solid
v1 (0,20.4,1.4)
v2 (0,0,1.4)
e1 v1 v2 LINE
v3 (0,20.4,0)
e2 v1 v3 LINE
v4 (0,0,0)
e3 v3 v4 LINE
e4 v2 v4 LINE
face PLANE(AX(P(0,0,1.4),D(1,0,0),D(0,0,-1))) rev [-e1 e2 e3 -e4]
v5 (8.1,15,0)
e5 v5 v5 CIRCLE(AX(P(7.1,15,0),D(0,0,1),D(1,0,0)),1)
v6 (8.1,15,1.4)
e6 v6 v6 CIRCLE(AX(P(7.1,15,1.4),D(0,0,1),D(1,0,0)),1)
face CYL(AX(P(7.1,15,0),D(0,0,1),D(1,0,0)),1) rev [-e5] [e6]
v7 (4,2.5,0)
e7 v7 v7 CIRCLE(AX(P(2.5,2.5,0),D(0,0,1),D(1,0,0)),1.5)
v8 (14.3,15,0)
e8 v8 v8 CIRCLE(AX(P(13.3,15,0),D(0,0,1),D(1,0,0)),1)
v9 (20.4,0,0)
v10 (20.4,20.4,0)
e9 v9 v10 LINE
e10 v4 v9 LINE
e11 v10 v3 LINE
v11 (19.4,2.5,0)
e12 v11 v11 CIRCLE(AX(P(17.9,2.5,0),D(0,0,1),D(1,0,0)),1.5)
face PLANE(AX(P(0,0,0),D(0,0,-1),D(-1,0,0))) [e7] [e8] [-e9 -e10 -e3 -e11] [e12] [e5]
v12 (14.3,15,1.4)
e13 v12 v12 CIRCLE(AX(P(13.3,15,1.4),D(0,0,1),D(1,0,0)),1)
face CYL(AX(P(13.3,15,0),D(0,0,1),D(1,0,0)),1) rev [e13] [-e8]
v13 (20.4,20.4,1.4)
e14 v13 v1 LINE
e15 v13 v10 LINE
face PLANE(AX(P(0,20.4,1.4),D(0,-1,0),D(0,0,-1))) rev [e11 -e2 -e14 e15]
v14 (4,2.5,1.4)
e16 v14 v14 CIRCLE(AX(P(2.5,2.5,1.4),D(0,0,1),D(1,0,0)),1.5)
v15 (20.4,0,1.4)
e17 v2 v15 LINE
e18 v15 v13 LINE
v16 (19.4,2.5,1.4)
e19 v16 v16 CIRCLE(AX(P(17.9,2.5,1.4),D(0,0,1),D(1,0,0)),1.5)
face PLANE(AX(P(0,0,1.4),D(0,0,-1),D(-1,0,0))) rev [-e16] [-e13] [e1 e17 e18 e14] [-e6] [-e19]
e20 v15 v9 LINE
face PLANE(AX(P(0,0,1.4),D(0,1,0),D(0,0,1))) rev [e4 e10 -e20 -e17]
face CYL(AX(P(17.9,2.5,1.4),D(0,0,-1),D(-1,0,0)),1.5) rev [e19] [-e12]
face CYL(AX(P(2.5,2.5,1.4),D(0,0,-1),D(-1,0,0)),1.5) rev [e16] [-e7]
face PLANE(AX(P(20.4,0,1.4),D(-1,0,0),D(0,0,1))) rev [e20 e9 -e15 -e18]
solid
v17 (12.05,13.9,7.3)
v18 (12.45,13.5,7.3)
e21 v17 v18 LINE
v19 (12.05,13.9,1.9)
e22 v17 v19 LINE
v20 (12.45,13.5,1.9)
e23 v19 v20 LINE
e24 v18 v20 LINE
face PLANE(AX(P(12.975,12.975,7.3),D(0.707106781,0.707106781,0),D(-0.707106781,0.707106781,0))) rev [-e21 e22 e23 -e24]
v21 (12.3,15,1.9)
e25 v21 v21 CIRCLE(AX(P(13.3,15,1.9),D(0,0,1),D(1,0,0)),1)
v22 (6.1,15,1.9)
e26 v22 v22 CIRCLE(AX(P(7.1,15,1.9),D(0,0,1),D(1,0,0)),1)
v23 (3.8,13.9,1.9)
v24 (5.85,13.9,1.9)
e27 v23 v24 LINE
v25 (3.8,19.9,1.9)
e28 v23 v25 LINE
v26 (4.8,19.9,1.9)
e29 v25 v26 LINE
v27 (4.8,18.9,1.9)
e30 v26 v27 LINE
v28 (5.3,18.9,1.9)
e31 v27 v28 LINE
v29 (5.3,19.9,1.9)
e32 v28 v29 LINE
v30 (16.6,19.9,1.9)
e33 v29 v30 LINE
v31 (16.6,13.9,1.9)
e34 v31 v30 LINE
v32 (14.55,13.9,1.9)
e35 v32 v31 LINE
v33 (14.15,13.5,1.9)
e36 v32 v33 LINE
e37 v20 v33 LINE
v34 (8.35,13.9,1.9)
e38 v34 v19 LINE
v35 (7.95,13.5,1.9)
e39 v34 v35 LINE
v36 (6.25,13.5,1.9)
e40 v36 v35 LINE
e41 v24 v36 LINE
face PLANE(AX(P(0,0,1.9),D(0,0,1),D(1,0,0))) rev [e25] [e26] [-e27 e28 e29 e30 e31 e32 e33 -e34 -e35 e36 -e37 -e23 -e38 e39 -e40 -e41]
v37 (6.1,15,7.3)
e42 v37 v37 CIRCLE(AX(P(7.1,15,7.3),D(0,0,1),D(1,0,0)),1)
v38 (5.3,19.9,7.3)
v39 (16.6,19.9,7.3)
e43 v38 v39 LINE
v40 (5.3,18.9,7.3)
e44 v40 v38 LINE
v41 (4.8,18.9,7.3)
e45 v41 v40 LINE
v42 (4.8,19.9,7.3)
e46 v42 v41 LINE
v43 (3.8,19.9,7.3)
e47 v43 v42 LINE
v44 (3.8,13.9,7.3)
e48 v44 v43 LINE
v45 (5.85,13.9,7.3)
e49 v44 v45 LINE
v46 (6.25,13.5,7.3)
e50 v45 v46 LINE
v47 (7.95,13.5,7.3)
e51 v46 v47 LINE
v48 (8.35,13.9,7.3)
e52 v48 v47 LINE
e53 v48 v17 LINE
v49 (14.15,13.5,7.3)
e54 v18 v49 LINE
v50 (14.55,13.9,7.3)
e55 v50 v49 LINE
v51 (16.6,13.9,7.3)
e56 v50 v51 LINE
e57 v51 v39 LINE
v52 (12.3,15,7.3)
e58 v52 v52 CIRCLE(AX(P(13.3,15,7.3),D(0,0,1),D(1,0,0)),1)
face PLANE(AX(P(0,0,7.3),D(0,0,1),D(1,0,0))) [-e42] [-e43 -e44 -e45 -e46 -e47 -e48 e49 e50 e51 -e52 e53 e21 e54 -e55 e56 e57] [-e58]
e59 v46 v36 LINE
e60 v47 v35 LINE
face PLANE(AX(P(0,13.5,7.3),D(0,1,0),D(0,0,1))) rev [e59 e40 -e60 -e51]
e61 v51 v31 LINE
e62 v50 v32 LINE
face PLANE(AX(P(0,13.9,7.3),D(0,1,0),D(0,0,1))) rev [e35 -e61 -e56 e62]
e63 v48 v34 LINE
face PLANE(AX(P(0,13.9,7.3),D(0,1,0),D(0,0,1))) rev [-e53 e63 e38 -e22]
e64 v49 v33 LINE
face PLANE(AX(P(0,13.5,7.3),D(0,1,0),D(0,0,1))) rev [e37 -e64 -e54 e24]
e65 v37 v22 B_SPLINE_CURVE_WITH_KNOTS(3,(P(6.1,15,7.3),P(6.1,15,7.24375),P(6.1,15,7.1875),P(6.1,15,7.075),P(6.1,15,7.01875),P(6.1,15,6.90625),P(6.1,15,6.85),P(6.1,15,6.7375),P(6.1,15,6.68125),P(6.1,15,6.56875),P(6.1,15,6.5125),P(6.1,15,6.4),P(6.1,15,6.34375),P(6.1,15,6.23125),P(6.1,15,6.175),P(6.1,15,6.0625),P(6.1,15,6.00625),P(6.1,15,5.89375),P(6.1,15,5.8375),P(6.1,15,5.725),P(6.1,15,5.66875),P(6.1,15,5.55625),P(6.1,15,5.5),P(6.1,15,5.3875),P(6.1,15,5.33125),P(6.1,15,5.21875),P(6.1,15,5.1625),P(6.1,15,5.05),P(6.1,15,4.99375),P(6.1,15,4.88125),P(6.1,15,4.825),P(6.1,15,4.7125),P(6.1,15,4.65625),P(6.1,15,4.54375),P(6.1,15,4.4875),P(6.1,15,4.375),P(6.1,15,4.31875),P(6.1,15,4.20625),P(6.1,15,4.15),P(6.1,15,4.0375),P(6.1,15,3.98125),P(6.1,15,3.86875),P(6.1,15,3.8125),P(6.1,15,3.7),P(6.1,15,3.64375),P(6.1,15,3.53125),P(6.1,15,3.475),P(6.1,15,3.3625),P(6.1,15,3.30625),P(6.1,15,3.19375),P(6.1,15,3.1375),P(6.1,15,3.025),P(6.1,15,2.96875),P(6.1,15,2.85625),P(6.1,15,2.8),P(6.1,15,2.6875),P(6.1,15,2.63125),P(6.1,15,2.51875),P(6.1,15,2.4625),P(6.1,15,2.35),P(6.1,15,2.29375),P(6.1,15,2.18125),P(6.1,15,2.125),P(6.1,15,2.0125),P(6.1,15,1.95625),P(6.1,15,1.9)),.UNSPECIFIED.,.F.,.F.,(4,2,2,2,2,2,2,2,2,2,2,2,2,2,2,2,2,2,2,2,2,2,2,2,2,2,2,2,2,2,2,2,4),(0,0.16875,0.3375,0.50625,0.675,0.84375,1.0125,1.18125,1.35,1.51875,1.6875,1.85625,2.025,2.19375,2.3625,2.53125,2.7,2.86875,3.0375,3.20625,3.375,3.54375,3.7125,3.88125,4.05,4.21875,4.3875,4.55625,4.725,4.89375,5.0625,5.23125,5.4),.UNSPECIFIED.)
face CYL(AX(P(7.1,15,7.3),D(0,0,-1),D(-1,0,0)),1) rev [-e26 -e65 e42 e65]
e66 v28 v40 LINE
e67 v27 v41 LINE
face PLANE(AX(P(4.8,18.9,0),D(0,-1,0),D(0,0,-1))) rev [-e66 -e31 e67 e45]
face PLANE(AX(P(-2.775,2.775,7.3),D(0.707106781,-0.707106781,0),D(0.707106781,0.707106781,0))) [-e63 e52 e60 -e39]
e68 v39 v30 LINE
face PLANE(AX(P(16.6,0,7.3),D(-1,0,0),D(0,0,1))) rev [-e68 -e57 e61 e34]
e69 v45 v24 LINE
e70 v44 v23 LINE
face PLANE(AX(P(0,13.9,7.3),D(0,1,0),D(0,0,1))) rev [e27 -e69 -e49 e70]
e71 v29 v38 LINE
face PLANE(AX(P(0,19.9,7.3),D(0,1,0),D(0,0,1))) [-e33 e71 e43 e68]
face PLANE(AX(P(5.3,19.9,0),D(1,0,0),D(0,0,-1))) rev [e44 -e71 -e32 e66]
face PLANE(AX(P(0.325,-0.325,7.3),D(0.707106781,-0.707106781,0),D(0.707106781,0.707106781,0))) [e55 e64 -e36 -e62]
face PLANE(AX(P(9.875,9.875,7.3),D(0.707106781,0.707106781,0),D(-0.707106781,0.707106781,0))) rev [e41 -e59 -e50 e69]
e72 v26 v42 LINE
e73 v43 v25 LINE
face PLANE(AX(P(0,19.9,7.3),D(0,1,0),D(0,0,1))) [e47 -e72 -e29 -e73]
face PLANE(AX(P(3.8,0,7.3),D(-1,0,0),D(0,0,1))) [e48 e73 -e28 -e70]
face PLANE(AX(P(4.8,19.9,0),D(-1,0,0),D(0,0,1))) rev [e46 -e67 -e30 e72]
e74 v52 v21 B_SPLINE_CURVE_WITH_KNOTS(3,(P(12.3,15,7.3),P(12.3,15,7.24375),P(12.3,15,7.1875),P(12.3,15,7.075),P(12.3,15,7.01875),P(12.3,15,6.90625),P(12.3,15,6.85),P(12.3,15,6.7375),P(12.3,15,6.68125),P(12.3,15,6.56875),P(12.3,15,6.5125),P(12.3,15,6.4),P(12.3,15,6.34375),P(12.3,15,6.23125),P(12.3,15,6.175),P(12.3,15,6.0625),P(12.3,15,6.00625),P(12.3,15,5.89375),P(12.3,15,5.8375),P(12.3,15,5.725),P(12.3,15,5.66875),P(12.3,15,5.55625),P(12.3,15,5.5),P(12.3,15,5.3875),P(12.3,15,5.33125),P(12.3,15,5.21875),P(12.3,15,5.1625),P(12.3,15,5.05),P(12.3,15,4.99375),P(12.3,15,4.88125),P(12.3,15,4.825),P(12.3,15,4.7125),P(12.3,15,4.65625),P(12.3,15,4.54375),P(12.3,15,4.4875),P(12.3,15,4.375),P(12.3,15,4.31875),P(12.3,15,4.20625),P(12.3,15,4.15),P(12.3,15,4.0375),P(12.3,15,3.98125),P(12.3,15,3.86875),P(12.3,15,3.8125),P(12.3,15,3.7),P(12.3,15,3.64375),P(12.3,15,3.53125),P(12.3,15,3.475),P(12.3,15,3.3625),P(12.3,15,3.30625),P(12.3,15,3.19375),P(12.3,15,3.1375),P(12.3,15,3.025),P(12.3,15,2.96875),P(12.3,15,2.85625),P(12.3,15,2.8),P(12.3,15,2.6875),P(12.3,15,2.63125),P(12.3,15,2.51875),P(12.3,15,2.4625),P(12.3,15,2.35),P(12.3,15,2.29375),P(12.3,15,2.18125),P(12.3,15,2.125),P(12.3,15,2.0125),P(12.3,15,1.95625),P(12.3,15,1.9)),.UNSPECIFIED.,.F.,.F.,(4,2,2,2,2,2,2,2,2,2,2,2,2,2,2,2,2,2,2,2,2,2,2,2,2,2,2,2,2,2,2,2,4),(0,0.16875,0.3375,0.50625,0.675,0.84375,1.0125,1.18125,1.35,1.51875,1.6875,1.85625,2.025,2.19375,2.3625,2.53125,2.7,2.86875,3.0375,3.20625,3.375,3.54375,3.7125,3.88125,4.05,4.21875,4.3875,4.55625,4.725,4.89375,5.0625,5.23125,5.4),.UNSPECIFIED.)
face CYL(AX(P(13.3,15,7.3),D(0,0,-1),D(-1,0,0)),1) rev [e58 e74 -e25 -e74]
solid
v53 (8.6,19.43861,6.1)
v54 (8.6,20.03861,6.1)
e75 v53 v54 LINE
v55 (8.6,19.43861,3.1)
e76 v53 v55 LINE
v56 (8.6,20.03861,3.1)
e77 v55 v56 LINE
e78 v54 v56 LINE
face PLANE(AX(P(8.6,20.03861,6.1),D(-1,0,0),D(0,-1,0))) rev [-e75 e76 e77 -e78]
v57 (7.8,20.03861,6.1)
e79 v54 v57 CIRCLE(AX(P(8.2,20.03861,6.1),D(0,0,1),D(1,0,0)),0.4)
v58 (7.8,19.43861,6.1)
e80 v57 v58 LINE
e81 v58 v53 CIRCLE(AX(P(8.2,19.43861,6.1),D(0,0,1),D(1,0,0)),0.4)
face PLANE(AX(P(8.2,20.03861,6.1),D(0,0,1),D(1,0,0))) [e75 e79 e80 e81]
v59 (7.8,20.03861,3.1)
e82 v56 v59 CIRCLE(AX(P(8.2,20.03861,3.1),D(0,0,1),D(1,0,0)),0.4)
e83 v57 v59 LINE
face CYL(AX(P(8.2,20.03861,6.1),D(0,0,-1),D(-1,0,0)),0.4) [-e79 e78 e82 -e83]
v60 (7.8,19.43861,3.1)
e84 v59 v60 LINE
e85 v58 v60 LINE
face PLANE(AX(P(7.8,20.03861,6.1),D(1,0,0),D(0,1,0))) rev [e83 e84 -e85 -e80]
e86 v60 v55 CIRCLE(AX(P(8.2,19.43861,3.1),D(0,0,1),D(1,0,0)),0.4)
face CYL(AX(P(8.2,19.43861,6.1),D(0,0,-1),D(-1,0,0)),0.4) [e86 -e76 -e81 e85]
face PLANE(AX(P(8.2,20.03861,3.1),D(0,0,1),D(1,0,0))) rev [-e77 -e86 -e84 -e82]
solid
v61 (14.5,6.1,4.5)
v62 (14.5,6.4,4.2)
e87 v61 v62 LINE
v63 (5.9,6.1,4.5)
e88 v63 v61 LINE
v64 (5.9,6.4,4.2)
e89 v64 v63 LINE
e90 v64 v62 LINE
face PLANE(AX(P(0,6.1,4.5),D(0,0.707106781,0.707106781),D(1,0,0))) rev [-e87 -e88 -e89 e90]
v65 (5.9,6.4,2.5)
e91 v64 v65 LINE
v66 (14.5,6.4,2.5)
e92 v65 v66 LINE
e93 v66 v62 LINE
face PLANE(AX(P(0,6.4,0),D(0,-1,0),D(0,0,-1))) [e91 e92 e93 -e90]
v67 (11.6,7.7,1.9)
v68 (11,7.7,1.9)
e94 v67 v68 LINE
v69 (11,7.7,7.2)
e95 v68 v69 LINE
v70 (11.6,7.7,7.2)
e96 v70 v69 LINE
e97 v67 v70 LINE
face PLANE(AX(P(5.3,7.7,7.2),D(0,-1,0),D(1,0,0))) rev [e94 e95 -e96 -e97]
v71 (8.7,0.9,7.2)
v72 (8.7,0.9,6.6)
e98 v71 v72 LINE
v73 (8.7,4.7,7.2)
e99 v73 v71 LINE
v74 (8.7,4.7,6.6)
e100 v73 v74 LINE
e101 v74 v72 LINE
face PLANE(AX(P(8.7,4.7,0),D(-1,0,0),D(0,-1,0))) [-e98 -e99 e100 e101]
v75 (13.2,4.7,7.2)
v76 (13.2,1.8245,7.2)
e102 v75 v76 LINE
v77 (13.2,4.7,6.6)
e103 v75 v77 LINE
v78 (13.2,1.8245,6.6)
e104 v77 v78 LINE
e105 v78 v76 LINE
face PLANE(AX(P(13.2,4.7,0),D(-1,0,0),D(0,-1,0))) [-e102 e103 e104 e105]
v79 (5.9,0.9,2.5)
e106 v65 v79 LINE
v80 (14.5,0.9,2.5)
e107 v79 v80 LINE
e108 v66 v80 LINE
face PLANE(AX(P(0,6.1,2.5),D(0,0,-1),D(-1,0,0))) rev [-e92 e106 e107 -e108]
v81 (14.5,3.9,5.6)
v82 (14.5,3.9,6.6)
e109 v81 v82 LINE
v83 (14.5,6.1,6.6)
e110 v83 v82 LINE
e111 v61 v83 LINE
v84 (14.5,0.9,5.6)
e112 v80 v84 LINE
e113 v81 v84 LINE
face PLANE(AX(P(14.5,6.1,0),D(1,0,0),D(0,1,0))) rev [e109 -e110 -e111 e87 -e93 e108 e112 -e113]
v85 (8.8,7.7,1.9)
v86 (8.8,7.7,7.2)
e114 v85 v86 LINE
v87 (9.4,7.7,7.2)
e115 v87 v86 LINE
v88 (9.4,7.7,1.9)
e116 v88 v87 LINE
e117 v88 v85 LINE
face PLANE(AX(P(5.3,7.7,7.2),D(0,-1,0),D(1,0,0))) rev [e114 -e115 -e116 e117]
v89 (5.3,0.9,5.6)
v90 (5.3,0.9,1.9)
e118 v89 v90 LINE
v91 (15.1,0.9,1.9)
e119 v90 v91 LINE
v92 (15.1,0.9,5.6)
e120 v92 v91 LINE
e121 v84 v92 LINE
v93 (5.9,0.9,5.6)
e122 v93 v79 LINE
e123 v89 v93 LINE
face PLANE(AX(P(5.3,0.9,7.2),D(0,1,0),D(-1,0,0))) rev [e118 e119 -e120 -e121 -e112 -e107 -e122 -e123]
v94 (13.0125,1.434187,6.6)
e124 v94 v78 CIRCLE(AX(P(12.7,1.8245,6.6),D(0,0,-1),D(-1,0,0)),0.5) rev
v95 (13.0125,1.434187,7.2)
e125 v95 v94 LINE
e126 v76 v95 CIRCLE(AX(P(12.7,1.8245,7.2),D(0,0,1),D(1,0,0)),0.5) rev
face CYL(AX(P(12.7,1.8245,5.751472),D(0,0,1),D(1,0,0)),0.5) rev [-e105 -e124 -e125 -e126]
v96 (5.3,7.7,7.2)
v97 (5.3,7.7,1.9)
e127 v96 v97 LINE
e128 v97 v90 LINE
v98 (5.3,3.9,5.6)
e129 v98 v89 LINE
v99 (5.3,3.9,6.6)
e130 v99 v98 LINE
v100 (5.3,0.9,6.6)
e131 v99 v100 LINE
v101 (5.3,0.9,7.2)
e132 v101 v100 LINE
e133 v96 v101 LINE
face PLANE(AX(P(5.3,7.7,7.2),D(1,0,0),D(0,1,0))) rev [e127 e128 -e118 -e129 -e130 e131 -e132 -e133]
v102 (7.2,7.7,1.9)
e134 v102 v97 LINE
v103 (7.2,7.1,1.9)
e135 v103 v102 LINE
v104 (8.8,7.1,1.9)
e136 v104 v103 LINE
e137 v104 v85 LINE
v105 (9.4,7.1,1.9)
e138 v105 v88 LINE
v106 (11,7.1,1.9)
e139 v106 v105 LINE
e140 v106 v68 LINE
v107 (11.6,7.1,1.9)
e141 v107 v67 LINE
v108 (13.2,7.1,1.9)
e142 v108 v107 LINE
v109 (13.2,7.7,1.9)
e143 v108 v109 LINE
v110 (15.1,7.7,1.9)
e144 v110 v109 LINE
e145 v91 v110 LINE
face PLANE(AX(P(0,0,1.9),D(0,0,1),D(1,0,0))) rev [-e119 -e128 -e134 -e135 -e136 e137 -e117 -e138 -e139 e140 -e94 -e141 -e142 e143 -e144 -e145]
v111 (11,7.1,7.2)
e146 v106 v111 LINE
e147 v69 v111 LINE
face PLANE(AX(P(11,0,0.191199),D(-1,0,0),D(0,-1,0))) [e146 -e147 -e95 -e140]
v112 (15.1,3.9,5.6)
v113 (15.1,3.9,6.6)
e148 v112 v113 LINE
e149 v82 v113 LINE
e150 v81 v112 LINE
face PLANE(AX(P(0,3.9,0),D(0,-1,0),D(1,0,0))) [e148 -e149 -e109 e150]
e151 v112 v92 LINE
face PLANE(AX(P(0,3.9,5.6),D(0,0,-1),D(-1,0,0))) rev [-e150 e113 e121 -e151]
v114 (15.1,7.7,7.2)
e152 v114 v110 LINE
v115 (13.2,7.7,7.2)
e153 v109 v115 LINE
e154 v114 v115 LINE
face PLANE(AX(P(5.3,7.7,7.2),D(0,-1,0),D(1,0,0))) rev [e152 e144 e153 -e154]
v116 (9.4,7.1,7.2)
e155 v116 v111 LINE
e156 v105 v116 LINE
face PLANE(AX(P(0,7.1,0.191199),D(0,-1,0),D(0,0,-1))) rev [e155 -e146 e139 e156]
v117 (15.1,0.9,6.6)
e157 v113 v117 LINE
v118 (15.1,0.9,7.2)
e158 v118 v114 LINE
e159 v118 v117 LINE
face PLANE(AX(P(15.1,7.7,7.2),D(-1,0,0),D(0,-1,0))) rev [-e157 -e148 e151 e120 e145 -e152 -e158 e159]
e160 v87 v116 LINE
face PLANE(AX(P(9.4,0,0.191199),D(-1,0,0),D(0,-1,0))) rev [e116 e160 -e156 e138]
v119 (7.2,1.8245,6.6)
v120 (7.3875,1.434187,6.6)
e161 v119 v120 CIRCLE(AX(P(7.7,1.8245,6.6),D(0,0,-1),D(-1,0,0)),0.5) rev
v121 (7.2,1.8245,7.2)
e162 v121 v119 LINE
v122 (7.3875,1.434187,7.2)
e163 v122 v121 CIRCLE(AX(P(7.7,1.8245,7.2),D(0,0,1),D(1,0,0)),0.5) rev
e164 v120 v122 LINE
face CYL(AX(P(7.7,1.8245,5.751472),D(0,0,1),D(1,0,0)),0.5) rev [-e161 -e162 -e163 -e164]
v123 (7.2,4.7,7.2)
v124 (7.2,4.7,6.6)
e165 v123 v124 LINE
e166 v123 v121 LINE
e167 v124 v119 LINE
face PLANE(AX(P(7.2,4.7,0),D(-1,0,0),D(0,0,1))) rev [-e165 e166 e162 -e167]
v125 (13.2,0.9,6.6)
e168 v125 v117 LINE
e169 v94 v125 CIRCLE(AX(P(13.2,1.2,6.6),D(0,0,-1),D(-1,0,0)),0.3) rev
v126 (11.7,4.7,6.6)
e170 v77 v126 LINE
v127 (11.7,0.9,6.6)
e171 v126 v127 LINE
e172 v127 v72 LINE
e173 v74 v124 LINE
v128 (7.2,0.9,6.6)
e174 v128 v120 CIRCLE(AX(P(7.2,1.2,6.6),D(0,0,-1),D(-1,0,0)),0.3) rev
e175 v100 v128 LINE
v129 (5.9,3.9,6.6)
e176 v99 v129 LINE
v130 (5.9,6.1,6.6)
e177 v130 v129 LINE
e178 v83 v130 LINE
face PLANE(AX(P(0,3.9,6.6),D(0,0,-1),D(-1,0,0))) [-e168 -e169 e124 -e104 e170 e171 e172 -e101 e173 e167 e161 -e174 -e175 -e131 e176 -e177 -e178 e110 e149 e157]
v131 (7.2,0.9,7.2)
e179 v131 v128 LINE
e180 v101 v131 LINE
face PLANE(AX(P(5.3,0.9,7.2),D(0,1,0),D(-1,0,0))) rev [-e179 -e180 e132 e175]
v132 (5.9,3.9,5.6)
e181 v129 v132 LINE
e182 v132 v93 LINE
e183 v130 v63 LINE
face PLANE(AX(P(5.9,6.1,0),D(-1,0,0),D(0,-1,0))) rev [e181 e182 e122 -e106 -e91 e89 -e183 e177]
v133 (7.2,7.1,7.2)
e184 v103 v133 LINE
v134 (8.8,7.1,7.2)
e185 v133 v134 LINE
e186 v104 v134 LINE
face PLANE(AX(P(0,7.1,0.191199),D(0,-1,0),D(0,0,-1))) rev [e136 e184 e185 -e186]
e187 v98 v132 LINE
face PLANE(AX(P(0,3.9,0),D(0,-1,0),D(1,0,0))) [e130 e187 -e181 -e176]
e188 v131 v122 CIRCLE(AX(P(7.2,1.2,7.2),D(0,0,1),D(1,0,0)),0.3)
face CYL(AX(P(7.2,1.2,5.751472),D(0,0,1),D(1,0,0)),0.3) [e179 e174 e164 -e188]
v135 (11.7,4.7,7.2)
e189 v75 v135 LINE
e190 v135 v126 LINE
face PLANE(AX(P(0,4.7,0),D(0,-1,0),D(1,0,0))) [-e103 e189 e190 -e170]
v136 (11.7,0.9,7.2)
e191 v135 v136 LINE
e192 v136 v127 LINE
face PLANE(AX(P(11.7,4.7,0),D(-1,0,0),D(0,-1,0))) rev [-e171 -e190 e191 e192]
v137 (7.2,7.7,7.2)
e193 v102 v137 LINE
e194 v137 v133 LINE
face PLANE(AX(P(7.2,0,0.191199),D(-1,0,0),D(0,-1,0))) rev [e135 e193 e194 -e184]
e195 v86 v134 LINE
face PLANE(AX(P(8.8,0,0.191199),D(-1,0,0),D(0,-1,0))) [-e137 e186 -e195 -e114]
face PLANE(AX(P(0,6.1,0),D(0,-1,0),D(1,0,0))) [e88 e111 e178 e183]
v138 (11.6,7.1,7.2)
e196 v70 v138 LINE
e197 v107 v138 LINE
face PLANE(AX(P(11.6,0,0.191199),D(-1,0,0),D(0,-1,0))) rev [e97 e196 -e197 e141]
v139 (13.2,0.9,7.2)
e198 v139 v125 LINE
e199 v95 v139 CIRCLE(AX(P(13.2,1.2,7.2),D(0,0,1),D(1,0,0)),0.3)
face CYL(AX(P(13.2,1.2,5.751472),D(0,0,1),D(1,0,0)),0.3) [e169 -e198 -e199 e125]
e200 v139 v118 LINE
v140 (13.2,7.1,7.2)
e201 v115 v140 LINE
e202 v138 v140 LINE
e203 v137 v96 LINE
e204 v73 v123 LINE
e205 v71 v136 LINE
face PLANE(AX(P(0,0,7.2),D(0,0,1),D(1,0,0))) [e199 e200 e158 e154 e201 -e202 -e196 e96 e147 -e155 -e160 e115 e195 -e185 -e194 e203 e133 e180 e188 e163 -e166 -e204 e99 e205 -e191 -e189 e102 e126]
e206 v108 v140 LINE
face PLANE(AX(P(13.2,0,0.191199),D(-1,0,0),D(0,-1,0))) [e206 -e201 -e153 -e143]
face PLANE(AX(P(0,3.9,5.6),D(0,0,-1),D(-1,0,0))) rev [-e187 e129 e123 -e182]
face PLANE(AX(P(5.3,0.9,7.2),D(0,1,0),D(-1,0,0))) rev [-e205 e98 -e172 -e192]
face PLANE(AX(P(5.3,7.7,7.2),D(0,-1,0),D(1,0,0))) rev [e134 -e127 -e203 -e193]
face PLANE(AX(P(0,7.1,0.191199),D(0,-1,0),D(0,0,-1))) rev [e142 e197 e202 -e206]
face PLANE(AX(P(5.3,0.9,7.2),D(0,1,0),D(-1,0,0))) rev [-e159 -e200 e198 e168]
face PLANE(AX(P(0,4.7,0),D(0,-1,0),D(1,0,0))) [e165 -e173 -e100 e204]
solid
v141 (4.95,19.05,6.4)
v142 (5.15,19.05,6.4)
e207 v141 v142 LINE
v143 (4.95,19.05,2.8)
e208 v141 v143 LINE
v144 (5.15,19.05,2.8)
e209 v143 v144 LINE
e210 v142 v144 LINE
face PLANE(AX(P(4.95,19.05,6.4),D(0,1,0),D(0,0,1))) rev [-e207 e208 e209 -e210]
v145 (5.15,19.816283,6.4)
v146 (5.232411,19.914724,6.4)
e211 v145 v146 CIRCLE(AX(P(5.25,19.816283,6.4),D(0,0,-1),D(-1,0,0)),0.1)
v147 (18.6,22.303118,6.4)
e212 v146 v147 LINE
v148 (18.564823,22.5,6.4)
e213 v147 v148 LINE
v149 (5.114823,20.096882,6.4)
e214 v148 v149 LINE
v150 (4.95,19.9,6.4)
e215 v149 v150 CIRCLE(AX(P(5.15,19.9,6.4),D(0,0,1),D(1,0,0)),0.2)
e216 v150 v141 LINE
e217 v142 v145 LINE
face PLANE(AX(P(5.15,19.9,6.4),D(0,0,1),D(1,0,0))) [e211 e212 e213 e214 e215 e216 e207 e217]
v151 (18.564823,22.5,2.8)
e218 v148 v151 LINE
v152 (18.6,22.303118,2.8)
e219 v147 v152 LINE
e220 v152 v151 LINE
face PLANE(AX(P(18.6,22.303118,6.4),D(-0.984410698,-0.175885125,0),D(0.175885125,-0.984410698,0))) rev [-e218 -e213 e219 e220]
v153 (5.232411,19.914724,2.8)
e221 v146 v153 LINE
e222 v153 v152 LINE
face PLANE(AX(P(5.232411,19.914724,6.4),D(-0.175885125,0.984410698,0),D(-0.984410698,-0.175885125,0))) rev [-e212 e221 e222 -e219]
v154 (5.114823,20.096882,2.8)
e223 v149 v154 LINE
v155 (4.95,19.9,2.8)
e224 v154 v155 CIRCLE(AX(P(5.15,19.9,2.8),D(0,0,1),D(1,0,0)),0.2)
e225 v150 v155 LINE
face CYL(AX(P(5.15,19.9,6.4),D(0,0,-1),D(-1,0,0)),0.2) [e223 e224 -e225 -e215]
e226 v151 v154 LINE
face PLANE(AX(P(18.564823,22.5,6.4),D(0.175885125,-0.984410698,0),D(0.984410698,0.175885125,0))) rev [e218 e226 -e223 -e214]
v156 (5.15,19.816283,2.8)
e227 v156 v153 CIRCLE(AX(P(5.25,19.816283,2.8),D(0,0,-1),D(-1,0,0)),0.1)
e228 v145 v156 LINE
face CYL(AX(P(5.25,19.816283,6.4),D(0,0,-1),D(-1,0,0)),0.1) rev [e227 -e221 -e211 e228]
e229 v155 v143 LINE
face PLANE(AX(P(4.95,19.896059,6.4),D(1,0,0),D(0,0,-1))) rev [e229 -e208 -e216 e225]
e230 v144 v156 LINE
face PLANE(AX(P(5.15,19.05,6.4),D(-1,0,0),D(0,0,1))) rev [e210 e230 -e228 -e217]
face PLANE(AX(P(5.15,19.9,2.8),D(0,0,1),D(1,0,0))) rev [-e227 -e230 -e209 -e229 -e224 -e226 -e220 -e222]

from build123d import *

# Parameters (mm, degrees)
SKETCH_1_W               = 20.4
SKETCH_1_H               = 20.4
SKETCH_1_R               = 1.5
EXTRUDE_1_DEPTH          = 1.4
EXTRUDE_START            = 0.5
SKETCH_2_W               = 9.8
SKETCH_2_H               = 6.8
EXTRUDE_2_DEPTH          = 5.3
SKETCH_3_W               = 0.6
SKETCH_3_H               = 1
CUT_EXTRUDE_1_DEPTH      = 3
SKETCH_3_3_W             = 1.5
SKETCH_3_3_H             = 0.6
CUT_EXTRUDE_2_DEPTH      = 3.8
SKETCH_3_4_W             = 8.6
SKETCH_3_4_H             = 3.1
CUT_EXTRUDE_3_DEPTH      = 5.2
CUT_EXTRUDE_4_DEPTH      = 0.3
CHAMFER_1_SIZE           = 0.3
SKETCH_5_R               = 0.3
EXTRUDE_3_DEPTH          = 0.6
FILLET_2_R               = 0.5
SKETCH_6_W               = 1.6
SKETCH_6_H               = 0.6
CUT_EXTRUDE_5_DEPTH      = 5.3
SKETCH_7_R               = 1
EXTRUDE_4_DEPTH          = 5.4
SKETCH_8_R               = 1
CUT_EXTRUDE_6_DEPTH      = 30.447071162
CUT_EXTRUDE_9_DEPTH      = 30.214380021
CUT_EXTRUDE_9_DEPTH_BACK = 30.214380021
SKETCH_10_W              = 0.5
SKETCH_10_H              = 1
EXTRUDE_5_DEPTH          = 1.8
EXTRUDE_6_DEPTH          = 1.5


with BuildPart() as part:
    # Эскиз1 → Бобышка-Вытянуть1 (new body)
    with BuildSketch(Plane.XY):
        with Locations((10.2, 10.2)):
            Rectangle(SKETCH_1_W, SKETCH_1_H)
        with Locations((17.9, 2.5)):
            Circle(SKETCH_1_R, mode=Mode.SUBTRACT)
        with Locations((2.5, 2.5)):
            Circle(SKETCH_1_R, mode=Mode.SUBTRACT)
    extrude(amount=EXTRUDE_1_DEPTH)

    # Эскиз8 → Вырез-Вытянуть6 (cut, through all)
    with BuildSketch(Plane.XY.offset(1.4)):
        with Locations(Location((13.3, 15, 0), (0, 0, 180))):
            Circle(SKETCH_8_R)
        with Locations(Location((7.1, 15, 0), (0, 0, 180))):
            Circle(SKETCH_8_R)
    extrude(amount=-CUT_EXTRUDE_6_DEPTH, mode=Mode.SUBTRACT)


with BuildPart() as body_2:
    # Эскиз2 → Бобышка-Вытянуть2 (new body)
    with BuildSketch(Plane.XY.offset(1.4).offset(EXTRUDE_START)):
        with Locations((10.2, 4.3)):
            Rectangle(SKETCH_2_W, SKETCH_2_H)
    extrude(amount=EXTRUDE_2_DEPTH)

    # Эскиз3 → Вырез-Вытянуть1 (cut)
    with BuildSketch(Plane.XZ.offset(-0.9)):
        with Locations((5.6, 6.1)):
            Rectangle(SKETCH_3_W, SKETCH_3_H)
        with Locations((14.8, 6.1)):
            Rectangle(SKETCH_3_W, SKETCH_3_H)
    extrude(amount=-CUT_EXTRUDE_1_DEPTH, mode=Mode.SUBTRACT)

    # Эскиз3<3> → Вырез-Вытянуть2 (cut)
    with BuildSketch(Plane.XZ.offset(-0.9)):
        with Locations((7.95, 6.9)):
            Rectangle(SKETCH_3_3_W, SKETCH_3_3_H)
        with Locations((12.45, 6.9)):
            Rectangle(SKETCH_3_3_W, SKETCH_3_3_H)
    extrude(amount=-CUT_EXTRUDE_2_DEPTH, mode=Mode.SUBTRACT)

    # Эскиз3<4> → Вырез-Вытянуть3 (cut)
    with BuildSketch(Plane.XZ.offset(-0.9)):
        with Locations((10.2, 4.05)):
            Rectangle(SKETCH_3_4_W, SKETCH_3_4_H)
        Polygon((5.9, 6.6), (5.9, 5.6), (14.5, 5.6), (14.5, 6.6), (13.2, 6.6), (11.7, 6.6), (8.7, 6.6), (7.2, 6.6), align=None)
    extrude(amount=-CUT_EXTRUDE_3_DEPTH, mode=Mode.SUBTRACT)

    # Эскиз4 → Вырез-Вытянуть4 (cut)
    with BuildSketch(Plane.XZ.offset(-6.1)):
        Polygon((7.2, 4.2), (5.9, 4.2), (5.9, 2.5), (14.5, 2.5), (14.5, 4.2), align=None)
    extrude(amount=-CUT_EXTRUDE_4_DEPTH, mode=Mode.SUBTRACT)

    # Фаска1
    chamfer_1_edges = [body_2.edges().sort_by_distance(p)[0] for p in [
        (10.2, 6.1, 4.2),
    ]]
    chamfer(chamfer_1_edges, length=CHAMFER_1_SIZE - 0.0001)  # a hair under: the kernel refuses the full size

    # Эскиз5 → Бобышка-Вытянуть3 (add)
    with BuildSketch(Plane.XY.offset(7.2)):
        with Locations((13.2, 1.2)):
            Circle(SKETCH_5_R)
        with Locations((7.2, 1.2)):
            Circle(SKETCH_5_R)
    extrude(amount=-EXTRUDE_3_DEPTH)

    # Скругление2
    fillet_2_edges = [body_2.edges().sort_by_distance(p)[0] for p in [
        (13.2, 1.5, 6.9),
        (7.2, 1.5, 6.9),
    ]]
    fillet(fillet_2_edges, radius=FILLET_2_R)

    # Эскиз6 → Вырез-Вытянуть5 (cut)
    with BuildSketch(Plane.XY.offset(7.2)):
        with Locations((8, 7.4)):
            Rectangle(SKETCH_6_W, SKETCH_6_H)
        with Locations((10.2, 7.4)):
            Rectangle(SKETCH_6_W, SKETCH_6_H)
        with Locations((12.4, 7.4)):
            Rectangle(SKETCH_6_W, SKETCH_6_H)
    extrude(amount=-CUT_EXTRUDE_5_DEPTH, mode=Mode.SUBTRACT)


with BuildPart() as body_3:
    # Эскиз7 → Бобышка-Вытянуть4 (new body)
    # profile 1 of 5: a face of its own
    with BuildSketch(Plane.XY.offset(1.4).offset(EXTRUDE_START)):
        Polygon((3.8, 19.9), (3.8, 13.9), (5.85, 13.9), (8.35, 13.9), (12.05, 13.9), (14.55, 13.9), (16.6, 13.9), (16.6, 19.9), align=None)
        with Locations(Location((7.1, 15, 0), (0, 0, 180))):
            Circle(SKETCH_7_R, mode=Mode.SUBTRACT)
        with Locations(Location((13.3, 15, 0), (0, 0, 180))):
            Circle(SKETCH_7_R, mode=Mode.SUBTRACT)
    # profile 2 of 5: a face of its own
    with BuildSketch(Plane.XY.offset(1.4).offset(EXTRUDE_START)):
        Polygon((8.35, 13.9), (5.85, 13.9), (6.25, 13.5), (7.1, 13.5), (7.95, 13.5), align=None)
    # profile 3 of 5: a face of its own
    with BuildSketch(Plane.XY.offset(1.4).offset(EXTRUDE_START)):
        Polygon((14.55, 13.9), (12.05, 13.9), (12.45, 13.5), (14.15, 13.5), align=None)
    # profile 4 of 5: a face of its own
    with BuildSketch(Plane.XY.offset(1.4).offset(EXTRUDE_START)):
        Polygon((3.8, 19.9), (3.8, 13.9), (5.85, 13.9), (8.35, 13.9), (12.05, 13.9), (14.55, 13.9), (16.6, 13.9), (16.6, 19.9), align=None)
        with Locations(Location((7.1, 15, 0), (0, 0, 180))):
            Circle(SKETCH_7_R, mode=Mode.SUBTRACT)
        with Locations(Location((13.3, 15, 0), (0, 0, 180))):
            Circle(SKETCH_7_R, mode=Mode.SUBTRACT)
    # profile 5 of 5: a face of its own
    with BuildSketch(Plane.XY.offset(1.4).offset(EXTRUDE_START)):
        Polygon((3.8, 19.9), (3.8, 13.9), (5.85, 13.9), (8.35, 13.9), (12.05, 13.9), (14.55, 13.9), (16.6, 13.9), (16.6, 19.9), align=None)
        with Locations(Location((7.1, 15, 0), (0, 0, 180))):
            Circle(SKETCH_7_R, mode=Mode.SUBTRACT)
        with Locations(Location((13.3, 15, 0), (0, 0, 180))):
            Circle(SKETCH_7_R, mode=Mode.SUBTRACT)
    extrude(amount=EXTRUDE_4_DEPTH)

    # Эскиз10 → Вырез-Вытянуть9 (cut, two sides: drawn at the far end of the back side and taken through both)
    with BuildSketch(Plane.XY.offset(4.6).offset(-CUT_EXTRUDE_9_DEPTH_BACK)):
        with Locations((5.05, 19.4)):
            Rectangle(SKETCH_10_W, SKETCH_10_H)
    extrude(amount=CUT_EXTRUDE_9_DEPTH + CUT_EXTRUDE_9_DEPTH_BACK, mode=Mode.SUBTRACT)


with BuildPart() as body_4:
    # Эскиз11 → Бобышка-Вытянуть5 (new, symmetric)
    with BuildSketch(Plane.XY.offset(4.6)):
        with BuildLine():
            Line((5.232411488, 19.914724499), (18.6, 22.30311786))
            Line((18.6, 22.30311786), (18.564822975, 22.5))
            Line((18.564822975, 22.5), (5.114822975, 20.09688214))
            ThreePointArc((5.114822975, 20.09688214), (4.996645175, 20.0283834), (4.95, 19.9))
            Line((4.95, 19.9), (4.95, 19.896059192))
            Line((4.95, 19.896059192), (4.95, 19.05))
            Line((4.95, 19.05), (5.15, 19.05))
            Line((5.15, 19.05), (5.15, 19.81628343))
            ThreePointArc((5.15, 19.81628343), (5.173322587, 19.88047513), (5.232411488, 19.914724499))
        make_face()
    extrude(amount=EXTRUDE_5_DEPTH, both=True)


with BuildPart() as body_5:
    # Эскиз12 → Бобышка-Вытянуть6 (new, symmetric)
    with BuildSketch(Plane.XY.offset(4.6)):
        with BuildLine():
            Line((8.6, 20.038610472), (8.6, 19.438610472))
            ThreePointArc((8.6, 19.438610472), (8.2, 19.038610472), (7.8, 19.438610472))
            Line((7.8, 19.438610472), (7.8, 20.038610472))
            ThreePointArc((7.8, 20.038610472), (8.2, 20.438610472), (8.6, 20.038610472))
        make_face()
    extrude(amount=EXTRUDE_6_DEPTH, both=True)


solid = Compound([part.part, body_2.part, body_3.part, body_4.part, body_5.part])
